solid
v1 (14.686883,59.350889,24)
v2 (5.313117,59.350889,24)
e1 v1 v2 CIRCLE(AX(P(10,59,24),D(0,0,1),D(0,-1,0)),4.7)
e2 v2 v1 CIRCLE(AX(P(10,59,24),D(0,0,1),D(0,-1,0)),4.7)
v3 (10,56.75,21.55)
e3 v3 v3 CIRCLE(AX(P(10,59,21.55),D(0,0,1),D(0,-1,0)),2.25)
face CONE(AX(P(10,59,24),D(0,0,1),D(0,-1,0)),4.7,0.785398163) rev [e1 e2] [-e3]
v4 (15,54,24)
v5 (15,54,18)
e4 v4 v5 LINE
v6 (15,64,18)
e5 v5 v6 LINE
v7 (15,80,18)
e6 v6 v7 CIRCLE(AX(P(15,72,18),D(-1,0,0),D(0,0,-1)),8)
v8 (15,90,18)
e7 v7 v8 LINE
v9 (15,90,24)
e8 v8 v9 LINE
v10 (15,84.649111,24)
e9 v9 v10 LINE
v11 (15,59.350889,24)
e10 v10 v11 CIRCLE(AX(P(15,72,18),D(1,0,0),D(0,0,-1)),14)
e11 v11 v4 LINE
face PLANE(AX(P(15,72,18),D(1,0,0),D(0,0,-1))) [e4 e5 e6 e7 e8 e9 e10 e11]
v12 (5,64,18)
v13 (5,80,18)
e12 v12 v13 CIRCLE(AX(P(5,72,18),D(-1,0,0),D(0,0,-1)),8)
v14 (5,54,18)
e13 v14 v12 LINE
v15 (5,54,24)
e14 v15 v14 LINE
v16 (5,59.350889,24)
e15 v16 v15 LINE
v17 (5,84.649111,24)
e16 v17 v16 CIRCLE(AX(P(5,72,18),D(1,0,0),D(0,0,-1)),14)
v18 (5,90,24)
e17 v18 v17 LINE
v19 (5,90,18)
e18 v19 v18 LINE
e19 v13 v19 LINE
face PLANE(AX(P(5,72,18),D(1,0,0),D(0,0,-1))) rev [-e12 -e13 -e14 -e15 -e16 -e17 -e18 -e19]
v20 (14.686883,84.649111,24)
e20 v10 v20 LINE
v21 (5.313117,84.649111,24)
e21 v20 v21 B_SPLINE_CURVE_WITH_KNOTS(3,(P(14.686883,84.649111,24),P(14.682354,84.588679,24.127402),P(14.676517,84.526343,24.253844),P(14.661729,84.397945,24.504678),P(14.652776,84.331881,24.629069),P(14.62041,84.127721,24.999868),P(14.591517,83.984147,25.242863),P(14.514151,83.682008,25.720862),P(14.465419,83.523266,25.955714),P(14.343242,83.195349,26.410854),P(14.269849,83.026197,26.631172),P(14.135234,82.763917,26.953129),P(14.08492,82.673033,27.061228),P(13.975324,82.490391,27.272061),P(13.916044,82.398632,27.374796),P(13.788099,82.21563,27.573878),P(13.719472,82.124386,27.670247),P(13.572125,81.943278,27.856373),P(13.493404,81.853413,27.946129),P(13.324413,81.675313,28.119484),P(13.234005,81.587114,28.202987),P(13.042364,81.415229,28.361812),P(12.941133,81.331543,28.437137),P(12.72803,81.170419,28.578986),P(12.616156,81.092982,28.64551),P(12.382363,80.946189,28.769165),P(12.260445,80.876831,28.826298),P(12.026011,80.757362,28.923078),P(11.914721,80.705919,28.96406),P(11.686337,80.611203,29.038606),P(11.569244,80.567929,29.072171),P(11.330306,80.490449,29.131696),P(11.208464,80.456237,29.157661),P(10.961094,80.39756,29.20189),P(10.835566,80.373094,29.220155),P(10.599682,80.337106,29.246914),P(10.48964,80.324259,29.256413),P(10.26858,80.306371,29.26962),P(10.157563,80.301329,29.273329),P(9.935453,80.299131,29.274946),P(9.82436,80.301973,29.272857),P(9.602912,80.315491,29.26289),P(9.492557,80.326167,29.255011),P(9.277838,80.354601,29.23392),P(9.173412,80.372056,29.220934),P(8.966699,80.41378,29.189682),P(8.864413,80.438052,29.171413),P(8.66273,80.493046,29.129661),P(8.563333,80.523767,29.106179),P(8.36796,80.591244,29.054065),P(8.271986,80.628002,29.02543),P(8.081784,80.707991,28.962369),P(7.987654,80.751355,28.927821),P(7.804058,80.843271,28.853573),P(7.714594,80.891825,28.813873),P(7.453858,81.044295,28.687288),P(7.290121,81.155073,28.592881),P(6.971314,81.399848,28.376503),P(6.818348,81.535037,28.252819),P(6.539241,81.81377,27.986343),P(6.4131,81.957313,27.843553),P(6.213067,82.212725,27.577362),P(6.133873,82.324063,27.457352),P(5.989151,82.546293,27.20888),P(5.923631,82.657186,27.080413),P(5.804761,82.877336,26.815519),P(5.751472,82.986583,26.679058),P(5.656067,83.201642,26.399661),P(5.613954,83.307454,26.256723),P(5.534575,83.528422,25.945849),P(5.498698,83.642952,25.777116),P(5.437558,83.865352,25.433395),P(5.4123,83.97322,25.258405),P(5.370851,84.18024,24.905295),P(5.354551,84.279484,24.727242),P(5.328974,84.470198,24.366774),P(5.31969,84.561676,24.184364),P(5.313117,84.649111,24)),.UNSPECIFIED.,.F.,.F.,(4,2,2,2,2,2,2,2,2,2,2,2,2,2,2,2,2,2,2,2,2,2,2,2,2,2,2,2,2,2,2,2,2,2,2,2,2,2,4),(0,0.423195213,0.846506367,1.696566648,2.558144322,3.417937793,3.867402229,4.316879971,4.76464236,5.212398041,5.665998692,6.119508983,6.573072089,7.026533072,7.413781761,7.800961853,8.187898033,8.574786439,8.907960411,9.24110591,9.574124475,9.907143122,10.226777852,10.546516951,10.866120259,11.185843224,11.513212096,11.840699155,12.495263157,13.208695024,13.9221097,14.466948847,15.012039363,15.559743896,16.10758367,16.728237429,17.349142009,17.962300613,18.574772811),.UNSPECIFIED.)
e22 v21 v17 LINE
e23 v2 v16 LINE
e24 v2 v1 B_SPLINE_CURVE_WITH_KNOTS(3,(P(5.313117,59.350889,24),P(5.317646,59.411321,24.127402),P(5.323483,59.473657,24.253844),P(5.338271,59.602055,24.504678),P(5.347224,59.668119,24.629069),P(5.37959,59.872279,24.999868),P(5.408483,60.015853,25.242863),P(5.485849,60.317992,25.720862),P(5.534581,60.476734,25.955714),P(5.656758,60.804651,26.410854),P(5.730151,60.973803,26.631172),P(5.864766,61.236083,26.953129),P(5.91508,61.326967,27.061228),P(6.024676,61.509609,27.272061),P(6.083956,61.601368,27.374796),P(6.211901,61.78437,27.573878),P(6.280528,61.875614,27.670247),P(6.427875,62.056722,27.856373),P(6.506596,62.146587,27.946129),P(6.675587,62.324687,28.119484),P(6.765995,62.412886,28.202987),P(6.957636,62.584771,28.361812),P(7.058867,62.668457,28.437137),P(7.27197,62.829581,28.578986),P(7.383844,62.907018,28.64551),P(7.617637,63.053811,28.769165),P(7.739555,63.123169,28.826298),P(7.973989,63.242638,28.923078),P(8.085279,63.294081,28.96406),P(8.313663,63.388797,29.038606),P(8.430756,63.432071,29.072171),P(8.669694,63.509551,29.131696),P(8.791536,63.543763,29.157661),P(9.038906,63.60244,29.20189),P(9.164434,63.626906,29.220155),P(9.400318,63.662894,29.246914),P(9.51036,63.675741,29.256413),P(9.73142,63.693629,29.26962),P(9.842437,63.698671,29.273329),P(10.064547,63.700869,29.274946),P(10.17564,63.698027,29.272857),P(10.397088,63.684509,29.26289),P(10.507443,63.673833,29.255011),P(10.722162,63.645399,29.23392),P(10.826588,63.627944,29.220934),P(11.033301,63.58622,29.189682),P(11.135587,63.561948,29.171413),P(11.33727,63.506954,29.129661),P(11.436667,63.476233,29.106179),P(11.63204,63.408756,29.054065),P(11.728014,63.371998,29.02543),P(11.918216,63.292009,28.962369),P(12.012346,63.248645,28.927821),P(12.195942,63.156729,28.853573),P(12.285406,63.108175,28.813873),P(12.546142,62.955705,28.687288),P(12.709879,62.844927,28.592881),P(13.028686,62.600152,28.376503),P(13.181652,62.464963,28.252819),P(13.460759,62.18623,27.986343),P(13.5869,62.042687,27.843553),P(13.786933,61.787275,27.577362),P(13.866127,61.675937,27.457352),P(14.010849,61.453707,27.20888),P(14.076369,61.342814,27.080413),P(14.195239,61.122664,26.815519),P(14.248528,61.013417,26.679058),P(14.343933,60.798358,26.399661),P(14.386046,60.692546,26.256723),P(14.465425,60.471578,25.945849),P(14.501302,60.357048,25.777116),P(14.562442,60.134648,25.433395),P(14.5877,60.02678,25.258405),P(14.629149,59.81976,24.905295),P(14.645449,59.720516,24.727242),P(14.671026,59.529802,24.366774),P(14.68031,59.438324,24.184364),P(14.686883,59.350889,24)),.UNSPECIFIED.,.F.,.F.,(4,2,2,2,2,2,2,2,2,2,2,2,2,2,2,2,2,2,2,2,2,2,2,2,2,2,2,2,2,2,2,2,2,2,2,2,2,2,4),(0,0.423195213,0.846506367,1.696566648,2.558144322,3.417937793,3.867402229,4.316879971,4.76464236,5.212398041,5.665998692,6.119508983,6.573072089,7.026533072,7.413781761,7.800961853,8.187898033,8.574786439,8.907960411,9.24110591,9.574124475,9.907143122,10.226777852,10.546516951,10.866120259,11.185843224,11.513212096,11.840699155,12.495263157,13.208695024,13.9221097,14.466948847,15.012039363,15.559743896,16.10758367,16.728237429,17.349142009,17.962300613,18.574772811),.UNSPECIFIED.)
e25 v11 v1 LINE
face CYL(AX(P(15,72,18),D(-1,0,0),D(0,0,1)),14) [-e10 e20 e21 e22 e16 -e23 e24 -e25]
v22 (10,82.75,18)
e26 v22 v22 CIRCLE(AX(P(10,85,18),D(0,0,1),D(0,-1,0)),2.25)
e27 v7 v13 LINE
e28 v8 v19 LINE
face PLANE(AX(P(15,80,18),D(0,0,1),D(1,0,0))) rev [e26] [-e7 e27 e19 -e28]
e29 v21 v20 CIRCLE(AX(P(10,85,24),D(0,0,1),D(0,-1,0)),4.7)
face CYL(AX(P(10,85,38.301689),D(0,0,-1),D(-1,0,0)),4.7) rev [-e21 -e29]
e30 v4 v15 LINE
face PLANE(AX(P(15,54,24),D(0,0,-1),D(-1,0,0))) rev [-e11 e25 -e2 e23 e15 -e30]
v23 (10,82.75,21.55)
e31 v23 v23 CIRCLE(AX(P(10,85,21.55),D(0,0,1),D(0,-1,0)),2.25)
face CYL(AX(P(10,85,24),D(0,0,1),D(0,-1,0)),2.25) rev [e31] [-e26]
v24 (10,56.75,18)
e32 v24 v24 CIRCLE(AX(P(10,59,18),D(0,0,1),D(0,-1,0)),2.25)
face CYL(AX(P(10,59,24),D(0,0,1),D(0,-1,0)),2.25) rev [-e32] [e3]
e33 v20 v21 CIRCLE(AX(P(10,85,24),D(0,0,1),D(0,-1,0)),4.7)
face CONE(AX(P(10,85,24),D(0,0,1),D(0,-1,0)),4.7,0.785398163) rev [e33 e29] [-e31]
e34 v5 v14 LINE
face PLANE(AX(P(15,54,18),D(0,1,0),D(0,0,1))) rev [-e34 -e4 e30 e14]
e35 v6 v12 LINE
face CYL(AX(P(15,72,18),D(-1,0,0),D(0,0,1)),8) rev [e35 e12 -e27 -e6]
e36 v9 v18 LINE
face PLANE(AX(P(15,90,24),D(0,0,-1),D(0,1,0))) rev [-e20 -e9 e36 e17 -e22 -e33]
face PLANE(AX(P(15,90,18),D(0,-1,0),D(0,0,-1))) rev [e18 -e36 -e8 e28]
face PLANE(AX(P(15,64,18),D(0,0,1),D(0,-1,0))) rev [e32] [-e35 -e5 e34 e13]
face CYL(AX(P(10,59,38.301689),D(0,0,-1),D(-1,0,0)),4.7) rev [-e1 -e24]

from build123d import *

# Parameters (mm, degrees)
EXTRUDE_1_DEPTH     = 5
CUT_EXTRUDE_1_REACH = 93.591
SKETCH_5_R          = 4.7


# Read off the part's stored shape, not the designer's step: 高级异型孔1
with BuildPart() as part:
    # 草图1 → 凸台-拉伸1 (new, symmetric)
    with BuildSketch(Plane(origin=(10, 0, 0), x_dir=(0, 0, -1), z_dir=(1, 0, 0))):
        with BuildLine():
            Line((-18, 80), (-18, 90))
            Line((-18, 90), (-24, 90))
            Line((-24, 90), (-24, 84.649110641))
            ThreePointArc((-24, 84.649110641), (-32, 72), (-24, 59.350889359))
            Line((-24, 59.350889359), (-24, 54))
            Line((-24, 54), (-18, 54))
            Line((-18, 54), (-18, 64))
            ThreePointArc((-18, 64), (-26, 72), (-18, 80))
        make_face()
    extrude(amount=EXTRUDE_1_DEPTH, both=True)

    # 高级异型孔1 outline → 高级异型孔1 (revolve, cut)
    with BuildSketch(Plane(origin=(10, 59, 0), x_dir=(1, 0, 0), z_dir=(0, -1, 0))):
        Polygon((0, 18), (2.25, 18), (2.25, 21.55), (4.7, 24), (0, 24), align=None)
    revolve(axis=Axis((10, 59, 0), (0, 0, 1)), mode=Mode.SUBTRACT)

    # Other 1 2 outline → Other 1 2 (revolve, cut)
    with BuildSketch(Plane(origin=(10, 85, 0), x_dir=(1, 0, 0), z_dir=(0, -1, 0))):
        Polygon((0, 18), (2.25, 18), (2.25, 21.55), (4.7, 24), (0, 24), align=None)
    revolve(axis=Axis((10, 85, 0), (0, 0, 1)), mode=Mode.SUBTRACT)

    # 草图5 → 切除-拉伸1 (cut, up to next)
    with BuildSketch(Plane.XY.offset(24), mode=Mode.PRIVATE) as cut_extrude_1_sk1:
        with Locations((10, 85)):
            Circle(SKETCH_5_R)
    cut_extrude_1_tool1 = extrude(cut_extrude_1_sk1.sketch, amount=CUT_EXTRUDE_1_REACH, mode=Mode.PRIVATE) & part.part
    # 草图5 → 切除-拉伸1 (cut, up to next)
    with BuildSketch(Plane.XY.offset(24), mode=Mode.PRIVATE) as cut_extrude_1_sk2:
        with Locations((10, 59)):
            Circle(SKETCH_5_R)
    cut_extrude_1_tool2 = extrude(cut_extrude_1_sk2.sketch, amount=CUT_EXTRUDE_1_REACH, mode=Mode.PRIVATE) & part.part
    add(cut_extrude_1_tool1.solids().sort_by_distance((10, 85, 24))[0], mode=Mode.SUBTRACT)
    add(cut_extrude_1_tool2.solids().sort_by_distance((10, 59, 24))[0], mode=Mode.SUBTRACT)


solid = part.part
